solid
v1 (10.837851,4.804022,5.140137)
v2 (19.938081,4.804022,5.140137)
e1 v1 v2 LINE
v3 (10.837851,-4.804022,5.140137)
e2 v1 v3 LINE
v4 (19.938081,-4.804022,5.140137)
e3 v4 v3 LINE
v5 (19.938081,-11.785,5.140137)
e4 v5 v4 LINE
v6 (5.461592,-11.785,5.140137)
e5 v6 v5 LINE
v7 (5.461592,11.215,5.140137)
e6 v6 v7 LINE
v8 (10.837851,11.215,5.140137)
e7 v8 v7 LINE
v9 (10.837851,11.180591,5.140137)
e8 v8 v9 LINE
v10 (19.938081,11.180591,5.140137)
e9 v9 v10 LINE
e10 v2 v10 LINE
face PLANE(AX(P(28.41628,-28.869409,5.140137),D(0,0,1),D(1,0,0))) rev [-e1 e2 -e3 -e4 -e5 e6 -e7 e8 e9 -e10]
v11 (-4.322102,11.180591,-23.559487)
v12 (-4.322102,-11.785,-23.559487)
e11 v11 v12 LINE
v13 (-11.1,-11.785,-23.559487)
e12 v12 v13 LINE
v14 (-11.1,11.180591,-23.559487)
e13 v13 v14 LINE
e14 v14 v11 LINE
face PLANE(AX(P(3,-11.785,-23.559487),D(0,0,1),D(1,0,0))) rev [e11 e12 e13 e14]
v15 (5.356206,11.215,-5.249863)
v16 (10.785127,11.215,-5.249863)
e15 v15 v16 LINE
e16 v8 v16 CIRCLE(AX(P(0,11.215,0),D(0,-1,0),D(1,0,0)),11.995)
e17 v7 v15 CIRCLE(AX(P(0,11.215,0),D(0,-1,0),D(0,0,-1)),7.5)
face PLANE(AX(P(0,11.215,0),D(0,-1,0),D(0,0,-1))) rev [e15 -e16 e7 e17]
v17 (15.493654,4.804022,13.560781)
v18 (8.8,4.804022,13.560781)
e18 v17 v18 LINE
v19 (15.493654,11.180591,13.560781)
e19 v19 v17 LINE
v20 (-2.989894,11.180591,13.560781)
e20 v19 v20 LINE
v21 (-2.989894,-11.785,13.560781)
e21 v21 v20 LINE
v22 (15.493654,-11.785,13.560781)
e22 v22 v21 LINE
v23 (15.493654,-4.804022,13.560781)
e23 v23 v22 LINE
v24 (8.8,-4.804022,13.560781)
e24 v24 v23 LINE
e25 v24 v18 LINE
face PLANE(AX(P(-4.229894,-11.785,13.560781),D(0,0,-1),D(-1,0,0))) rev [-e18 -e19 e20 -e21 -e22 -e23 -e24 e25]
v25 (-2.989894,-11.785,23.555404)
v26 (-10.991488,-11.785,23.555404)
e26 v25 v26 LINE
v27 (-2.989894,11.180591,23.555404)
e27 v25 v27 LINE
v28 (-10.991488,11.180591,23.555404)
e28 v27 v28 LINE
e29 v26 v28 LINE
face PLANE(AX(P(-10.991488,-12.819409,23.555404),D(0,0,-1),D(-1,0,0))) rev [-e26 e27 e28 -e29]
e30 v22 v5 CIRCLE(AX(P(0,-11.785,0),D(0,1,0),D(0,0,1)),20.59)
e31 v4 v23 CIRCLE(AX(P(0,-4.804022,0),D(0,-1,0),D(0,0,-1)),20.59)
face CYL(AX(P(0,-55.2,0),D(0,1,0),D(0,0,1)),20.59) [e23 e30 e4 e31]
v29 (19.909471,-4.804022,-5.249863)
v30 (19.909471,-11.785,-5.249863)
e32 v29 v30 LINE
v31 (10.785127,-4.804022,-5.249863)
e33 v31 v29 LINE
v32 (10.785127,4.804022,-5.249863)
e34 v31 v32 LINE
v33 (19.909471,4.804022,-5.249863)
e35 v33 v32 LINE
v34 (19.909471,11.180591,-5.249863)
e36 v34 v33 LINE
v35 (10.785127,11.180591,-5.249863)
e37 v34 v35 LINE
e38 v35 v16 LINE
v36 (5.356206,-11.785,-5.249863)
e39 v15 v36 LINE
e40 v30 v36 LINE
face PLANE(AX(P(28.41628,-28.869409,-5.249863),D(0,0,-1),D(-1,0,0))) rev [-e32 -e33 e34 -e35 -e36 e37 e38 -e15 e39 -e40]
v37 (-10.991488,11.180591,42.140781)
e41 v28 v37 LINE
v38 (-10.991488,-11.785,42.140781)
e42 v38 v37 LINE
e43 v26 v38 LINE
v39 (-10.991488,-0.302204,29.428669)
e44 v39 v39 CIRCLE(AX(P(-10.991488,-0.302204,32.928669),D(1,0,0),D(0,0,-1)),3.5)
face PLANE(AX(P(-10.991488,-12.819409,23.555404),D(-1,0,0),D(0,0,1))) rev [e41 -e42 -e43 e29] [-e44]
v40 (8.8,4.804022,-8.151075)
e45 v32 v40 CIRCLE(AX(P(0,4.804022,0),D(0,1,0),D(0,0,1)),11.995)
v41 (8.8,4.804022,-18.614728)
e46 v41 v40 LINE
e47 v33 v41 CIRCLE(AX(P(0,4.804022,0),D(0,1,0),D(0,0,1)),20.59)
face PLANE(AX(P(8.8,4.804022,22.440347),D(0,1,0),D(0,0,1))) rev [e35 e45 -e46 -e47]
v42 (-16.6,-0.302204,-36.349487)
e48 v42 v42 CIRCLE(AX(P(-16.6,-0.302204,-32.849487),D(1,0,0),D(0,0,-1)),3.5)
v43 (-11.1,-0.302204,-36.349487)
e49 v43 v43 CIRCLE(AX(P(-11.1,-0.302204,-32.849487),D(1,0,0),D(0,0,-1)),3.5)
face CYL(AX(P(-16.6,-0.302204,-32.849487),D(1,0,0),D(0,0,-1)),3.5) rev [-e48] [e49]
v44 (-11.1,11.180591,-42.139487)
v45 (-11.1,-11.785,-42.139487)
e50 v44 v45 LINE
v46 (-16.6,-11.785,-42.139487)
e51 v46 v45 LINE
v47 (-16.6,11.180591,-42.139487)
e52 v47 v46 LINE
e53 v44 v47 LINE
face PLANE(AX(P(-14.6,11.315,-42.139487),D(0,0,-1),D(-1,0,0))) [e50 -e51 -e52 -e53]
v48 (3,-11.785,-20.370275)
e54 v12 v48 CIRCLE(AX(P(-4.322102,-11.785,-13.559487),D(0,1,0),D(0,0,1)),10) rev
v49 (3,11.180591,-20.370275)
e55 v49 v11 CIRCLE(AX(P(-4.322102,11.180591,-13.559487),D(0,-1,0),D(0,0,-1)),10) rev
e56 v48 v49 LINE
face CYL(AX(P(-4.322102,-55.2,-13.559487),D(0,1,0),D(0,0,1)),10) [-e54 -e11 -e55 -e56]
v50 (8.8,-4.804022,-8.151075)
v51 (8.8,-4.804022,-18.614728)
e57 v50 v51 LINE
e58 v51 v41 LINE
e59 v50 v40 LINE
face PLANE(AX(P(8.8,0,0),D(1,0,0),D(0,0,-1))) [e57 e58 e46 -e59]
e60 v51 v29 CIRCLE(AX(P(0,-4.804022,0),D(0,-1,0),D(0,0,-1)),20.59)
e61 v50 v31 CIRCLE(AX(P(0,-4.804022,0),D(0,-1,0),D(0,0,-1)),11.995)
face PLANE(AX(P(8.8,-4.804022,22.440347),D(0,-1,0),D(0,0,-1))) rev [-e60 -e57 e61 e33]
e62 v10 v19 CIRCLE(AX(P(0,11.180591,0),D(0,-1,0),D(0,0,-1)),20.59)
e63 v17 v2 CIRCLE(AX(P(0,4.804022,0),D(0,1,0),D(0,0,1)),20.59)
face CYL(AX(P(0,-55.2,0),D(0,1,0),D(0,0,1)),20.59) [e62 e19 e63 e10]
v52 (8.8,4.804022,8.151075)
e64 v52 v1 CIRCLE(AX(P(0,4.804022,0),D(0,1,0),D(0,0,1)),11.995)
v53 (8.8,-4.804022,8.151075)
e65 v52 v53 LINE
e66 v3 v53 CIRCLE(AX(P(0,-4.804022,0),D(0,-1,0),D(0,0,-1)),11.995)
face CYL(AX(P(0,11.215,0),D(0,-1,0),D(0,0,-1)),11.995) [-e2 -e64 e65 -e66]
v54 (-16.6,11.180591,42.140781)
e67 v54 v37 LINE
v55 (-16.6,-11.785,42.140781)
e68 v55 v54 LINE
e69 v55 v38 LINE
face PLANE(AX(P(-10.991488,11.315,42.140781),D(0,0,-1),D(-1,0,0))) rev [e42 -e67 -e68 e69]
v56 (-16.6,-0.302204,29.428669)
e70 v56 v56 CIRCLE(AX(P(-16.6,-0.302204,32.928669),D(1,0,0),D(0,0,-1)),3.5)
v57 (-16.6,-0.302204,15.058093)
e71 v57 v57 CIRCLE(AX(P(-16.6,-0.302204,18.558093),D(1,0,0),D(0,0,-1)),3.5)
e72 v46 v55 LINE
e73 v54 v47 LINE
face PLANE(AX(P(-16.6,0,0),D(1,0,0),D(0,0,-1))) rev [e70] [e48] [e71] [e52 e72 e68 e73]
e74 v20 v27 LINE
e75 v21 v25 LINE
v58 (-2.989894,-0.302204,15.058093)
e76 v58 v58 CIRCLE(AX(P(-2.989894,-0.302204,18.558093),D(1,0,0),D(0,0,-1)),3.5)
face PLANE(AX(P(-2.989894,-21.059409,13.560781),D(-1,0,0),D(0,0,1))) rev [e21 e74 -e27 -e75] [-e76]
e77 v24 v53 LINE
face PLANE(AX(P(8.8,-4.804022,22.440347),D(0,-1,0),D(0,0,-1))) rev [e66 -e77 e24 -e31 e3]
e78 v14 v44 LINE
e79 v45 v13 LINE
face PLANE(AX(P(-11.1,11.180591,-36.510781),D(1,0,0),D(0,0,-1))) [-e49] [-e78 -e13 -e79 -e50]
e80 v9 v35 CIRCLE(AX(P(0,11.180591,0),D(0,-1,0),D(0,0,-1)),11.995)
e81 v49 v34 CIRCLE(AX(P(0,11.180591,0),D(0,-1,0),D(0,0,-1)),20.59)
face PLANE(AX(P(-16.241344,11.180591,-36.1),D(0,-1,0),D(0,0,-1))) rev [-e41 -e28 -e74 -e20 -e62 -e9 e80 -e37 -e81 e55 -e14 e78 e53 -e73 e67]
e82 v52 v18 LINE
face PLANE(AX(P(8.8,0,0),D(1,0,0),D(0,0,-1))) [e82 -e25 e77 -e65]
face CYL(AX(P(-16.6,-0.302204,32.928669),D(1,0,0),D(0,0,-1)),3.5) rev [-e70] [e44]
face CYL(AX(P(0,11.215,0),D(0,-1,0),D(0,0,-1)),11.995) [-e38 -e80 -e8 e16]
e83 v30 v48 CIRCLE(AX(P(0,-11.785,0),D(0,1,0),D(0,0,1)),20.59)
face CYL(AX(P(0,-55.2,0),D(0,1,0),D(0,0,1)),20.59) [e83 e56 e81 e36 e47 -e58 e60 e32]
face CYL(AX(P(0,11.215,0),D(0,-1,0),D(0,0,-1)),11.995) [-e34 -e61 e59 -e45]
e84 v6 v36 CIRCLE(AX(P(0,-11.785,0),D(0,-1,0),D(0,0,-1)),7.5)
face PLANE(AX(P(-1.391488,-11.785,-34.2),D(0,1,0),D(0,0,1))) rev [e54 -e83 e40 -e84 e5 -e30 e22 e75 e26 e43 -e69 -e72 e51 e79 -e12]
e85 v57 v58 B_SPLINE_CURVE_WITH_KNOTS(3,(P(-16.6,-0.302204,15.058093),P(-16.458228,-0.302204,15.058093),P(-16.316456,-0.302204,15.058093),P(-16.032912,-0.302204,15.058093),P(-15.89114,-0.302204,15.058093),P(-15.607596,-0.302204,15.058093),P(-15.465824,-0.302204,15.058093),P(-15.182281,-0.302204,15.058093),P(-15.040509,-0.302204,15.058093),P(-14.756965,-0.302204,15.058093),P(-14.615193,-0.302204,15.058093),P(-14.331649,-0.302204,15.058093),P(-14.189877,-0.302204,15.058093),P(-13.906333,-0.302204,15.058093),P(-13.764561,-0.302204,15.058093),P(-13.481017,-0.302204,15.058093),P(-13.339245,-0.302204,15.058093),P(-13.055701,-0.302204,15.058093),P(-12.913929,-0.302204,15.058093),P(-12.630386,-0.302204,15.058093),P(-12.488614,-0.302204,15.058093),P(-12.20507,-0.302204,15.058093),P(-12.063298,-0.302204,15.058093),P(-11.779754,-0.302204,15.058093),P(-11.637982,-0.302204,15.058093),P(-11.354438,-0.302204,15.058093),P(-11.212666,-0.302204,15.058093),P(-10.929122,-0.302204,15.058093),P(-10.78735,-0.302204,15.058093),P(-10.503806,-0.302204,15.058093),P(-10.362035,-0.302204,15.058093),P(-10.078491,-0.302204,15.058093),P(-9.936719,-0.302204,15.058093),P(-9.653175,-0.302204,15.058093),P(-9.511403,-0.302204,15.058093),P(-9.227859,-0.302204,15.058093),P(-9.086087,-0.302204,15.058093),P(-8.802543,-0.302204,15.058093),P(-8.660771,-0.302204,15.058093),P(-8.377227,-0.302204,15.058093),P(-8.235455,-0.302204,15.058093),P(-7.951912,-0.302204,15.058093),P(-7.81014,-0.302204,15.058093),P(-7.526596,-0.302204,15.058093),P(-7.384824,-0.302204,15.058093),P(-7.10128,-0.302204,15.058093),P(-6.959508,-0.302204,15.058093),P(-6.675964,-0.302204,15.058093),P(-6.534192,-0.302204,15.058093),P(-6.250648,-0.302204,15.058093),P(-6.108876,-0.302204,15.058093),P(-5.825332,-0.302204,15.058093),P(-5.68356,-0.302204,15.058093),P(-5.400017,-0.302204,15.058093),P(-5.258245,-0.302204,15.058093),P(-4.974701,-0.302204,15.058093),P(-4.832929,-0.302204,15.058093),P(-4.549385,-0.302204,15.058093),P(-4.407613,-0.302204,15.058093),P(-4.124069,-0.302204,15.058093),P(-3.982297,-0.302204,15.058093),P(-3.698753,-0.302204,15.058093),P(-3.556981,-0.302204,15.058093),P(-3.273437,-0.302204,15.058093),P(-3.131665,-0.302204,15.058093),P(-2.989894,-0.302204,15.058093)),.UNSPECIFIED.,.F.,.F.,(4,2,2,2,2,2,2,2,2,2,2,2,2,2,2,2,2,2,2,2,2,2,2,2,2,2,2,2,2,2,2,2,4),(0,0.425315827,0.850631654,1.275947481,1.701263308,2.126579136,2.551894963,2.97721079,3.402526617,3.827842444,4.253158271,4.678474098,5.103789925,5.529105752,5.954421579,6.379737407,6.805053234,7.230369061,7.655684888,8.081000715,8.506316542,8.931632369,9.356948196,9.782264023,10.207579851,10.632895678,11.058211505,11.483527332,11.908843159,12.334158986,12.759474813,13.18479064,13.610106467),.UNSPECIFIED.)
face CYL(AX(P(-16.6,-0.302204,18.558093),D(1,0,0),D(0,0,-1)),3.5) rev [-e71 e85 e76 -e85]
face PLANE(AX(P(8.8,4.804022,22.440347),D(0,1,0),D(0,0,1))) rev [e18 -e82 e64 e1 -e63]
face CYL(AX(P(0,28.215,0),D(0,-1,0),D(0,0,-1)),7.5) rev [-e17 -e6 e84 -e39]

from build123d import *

# Parameters (mm, degrees)
SKETCH_1_R           = 20.68
SKETCH_1_R_2         = 9.68
EXTRUDE_1_DEPTH      = 116.68
SKETCH_11_W          = 27
SKETCH_11_H          = 150
CUT_EXTRUDE_3_DEPTH  = 40
SKETCH_13_W          = 10
SKETCH_13_H          = 128.345013401
CUT_EXTRUDE_7_DEPTH  = 126.614916312
SKETCH_15_W          = 8
SKETCH_15_H          = 68.68
CUT_EXTRUDE_9_DEPTH  = 48
SKETCH_16_W          = 15.549431524
SKETCH_16_H          = 20
SKETCH_16_W_2        = 15.459431524
EXTRUDE_4_DEPTH      = 19.2
SKETCH_17_W          = 19.20851187
SKETCH_17_H          = 14.03
CUT_EXTRUDE_10_DEPTH = 20.2
SKETCH_18_R          = 9.59
CUT_EXTRUDE_11_DEPTH = 121.289430957
SKETCH_21_R          = 2.985
CUT_EXTRUDE_12_DEPTH = 55.2
EXTRUDE_START        = 55.2
SKETCH_24_R          = 20.59
SKETCH_24_R_2        = 9.59
EXTRUDE_2_DEPTH      = 55.2
CUT_EXTRUDE_13_DEPTH = 55.2
SKETCH_26_W          = 10.00851187
SKETCH_26_H          = 41.68
CUT_EXTRUDE_15_DEPTH = 55.2
SKETCH_27_W          = 10
SKETCH_27_H          = 40
CUT_EXTRUDE_16_DEPTH = 55.2
SKETCH_28_W          = 44.880694938
SKETCH_28_H          = 9.608044066
CUT_EXTRUDE_17_DEPTH = 12.2
SKETCH_35_W          = 13.53
SKETCH_35_H          = 20
EXTRUDE_10_DEPTH     = 15
EXTRUDE_11_DEPTH     = 15
SKETCH_37_W          = 9
SKETCH_37_H          = 20
EXTRUDE_12_DEPTH     = 20
SKETCH_38_W          = 9
SKETCH_38_H          = 20
EXTRUDE_13_DEPTH     = 20
SKETCH_42_R          = 2.985
CUT_EXTRUDE_21_DEPTH = 20
CUT_EXTRUDE_23_DEPTH = 138.235841092
SKETCH_45_W          = 3
SKETCH_45_H          = 20
EXTRUDE_14_DEPTH     = 30
SKETCH_46_W          = 3
SKETCH_46_H          = 20
EXTRUDE_15_DEPTH     = 30
SKETCH_47_W          = 33.078221107
SKETCH_47_H          = 20
EXTRUDE_16_DEPTH     = 50
SKETCH_48_W          = 30
SKETCH_48_H          = 20
EXTRUDE_17_DEPTH     = 50
SKETCH_50_W          = 50
SKETCH_50_H          = 20
EXTRUDE_18_DEPTH     = 1
SKETCH_51_W          = 50
SKETCH_51_H          = 20
EXTRUDE_19_DEPTH     = 1
SKETCH_52_W          = 53
SKETCH_52_H          = 14
CUT_EXTRUDE_24_DEPTH = 151.972575738
SKETCH_53_W          = 53
SKETCH_53_H          = 14
CUT_EXTRUDE_25_DEPTH = 151.942387436
SKETCH_54_W          = 40
SKETCH_54_H          = 73.27
CUT_EXTRUDE_26_DEPTH = 147.866192927
SKETCH_56_W          = 13.00851187
SKETCH_56_H          = 20
EXTRUDE_21_DEPTH     = 3.08
SKETCH_60_W          = 6.504255935
SKETCH_60_H          = 76.35
CUT_EXTRUDE_30_DEPTH = 137.106994034
CUT_EXTRUDE_32_DEPTH = 20
SKETCH_64_W          = 16.20851187
SKETCH_64_H          = 0.09
EXTRUDE_22_DEPTH     = 20
SKETCH_65_W          = 3.495744065
SKETCH_65_H          = 3.26
CUT_EXTRUDE_33_DEPTH = 137.057988464
SKETCH_66_W          = 3.495744065
SKETCH_66_H          = 1.776778893
SKETCH_66_W_2        = 3.503635083
SKETCH_66_H_2        = 1.775
EXTRUDE_23_DEPTH     = 20.2
SKETCH_68_W          = 6.504255935
SKETCH_68_H          = 3.66
CUT_EXTRUDE_34_DEPTH = 20
SKETCH_69_R          = 2.985
CUT_EXTRUDE_35_DEPTH = 126.598983893
SKETCH_70_R          = 2.985
CUT_EXTRUDE_36_DEPTH = 132.360728238
SKETCH_71_W          = 38.005321573
SKETCH_71_H          = 111.965885132
CUT_EXTRUDE_37_DEPTH = 147.475577566
SKETCH_72_R          = 9.7
CUT_EXTRUDE_38_DEPTH = 38.185254838
CUT_EXTRUDE_START    = -22
SKETCH_77_R          = 30.59
SKETCH_77_R_2        = 20.59
CUT_EXTRUDE_2_DEPTH  = 22
SKETCH_78_W          = 34.816185151
SKETCH_78_H          = 22.96559116
EXTRUDE_26_DEPTH     = 0.1
SKETCH_80_W          = 2.900031179
SKETCH_80_H          = 6.148706656
EXTRUDE_28_DEPTH     = 23.1
SKETCH_81_W          = 6.148706656
SKETCH_81_H          = 23.1
EXTRUDE_29_DEPTH     = 14.1
SKETCH_82_W          = 6.148706656
SKETCH_82_H          = 0.13440884
CUT_EXTRUDE_39_DEPTH = 19.1
SKETCH_83_W          = 2.900031179
SKETCH_83_H          = 22.96559116
EXTRUDE_30_DEPTH     = 19.1
FILLET_1_R           = 10
SKETCH_84_W          = 3.5
SKETCH_84_H          = 19.1
EXTRUDE_31_DEPTH     = 23.1
SKETCH_85_W          = 3.5
SKETCH_85_H          = 0.52
CUT_EXTRUDE_40_DEPTH = 48.860163141
SKETCH_86_W          = 3.5
SKETCH_86_H          = 22.96559116
EXTRUDE_32_DEPTH     = 62.1
SKETCH_87_W          = 3.60851187
SKETCH_87_H          = 34.816185151
CUT_EXTRUDE_41_DEPTH = 62.1
SKETCH_89_W          = 0.10851187
SKETCH_89_H          = 6.15
EXTRUDE_33_DEPTH     = 23.1
EXTRUDE_34_DEPTH     = 22.1
SKETCH_91_W          = 0.971561636
SKETCH_91_H          = 22.96559116
CUT_EXTRUDE_42_DEPTH = 22.1
SKETCH_95_W          = 6.15
SKETCH_95_H          = 22.96559116
EXTRUDE_35_DEPTH     = 14.1
FILLET_2_R           = 10
SKETCH_96_W          = 3.60851187
SKETCH_96_H          = 2.548438364
CUT_EXTRUDE_43_DEPTH = 55.35700885
SKETCH_97_W          = 3.5
SKETCH_97_H          = 6.148706656
EXTRUDE_36_DEPTH     = 23.1
CUT_EXTRUDE_44_DEPTH = 23.1
SKETCH_99_W          = 6.15
SKETCH_99_H          = 0.13440884
CUT_EXTRUDE_45_DEPTH = 23.1
SKETCH_101_R         = 2.985
CUT_EXTRUDE_46_DEPTH = 23.1
SKETCH_103_W         = 3.60851187
SKETCH_103_H         = 0.54
CUT_EXTRUDE_49_DEPTH = 53.222714265
SKETCH_104_W         = 3.60851187
SKETCH_104_H         = 0.54
CUT_EXTRUDE_50_DEPTH = 53.222714265
SKETCH_123_W         = 24.188706656
SKETCH_123_H         = 22.96559116
SKETCH_123_W_2       = 24.195376485
EXTRUDE_37_DEPTH     = 2
SKETCH_124_R         = 3.05
CUT_EXTRUDE_60_DEPTH = 57.152183688
SKETCH_126_W         = 29.889481087
SKETCH_126_H         = 8.39
CUT_EXTRUDE_61_DEPTH = 53.222714265
SKETCH_127_W         = 18.58
SKETCH_127_H         = 22.96559116
EXTRUDE_38_DEPTH     = 10
SKETCH_128_R         = 3.25
CUT_EXTRUDE_62_DEPTH = 58.155273368
SKETCH_129_R         = 3.25
CUT_EXTRUDE_63_DEPTH = 58.155273368
SKETCH_130_W         = 24.958479246
SKETCH_130_H         = 10
CUT_EXTRUDE_64_DEPTH = 53.058343712
SKETCH_136_W         = 10
SKETCH_136_H         = 18.585376485
CUT_EXTRUDE_68_DEPTH = 24
SKETCH_138_W         = 5.60851187
SKETCH_138_H         = 22.96559116
EXTRUDE_40_DEPTH     = 38
SKETCH_141_W         = 9.994623515
SKETCH_141_H         = 22.96559116
EXTRUDE_41_DEPTH     = 3.24
SKETCH_144_W         = 2
SKETCH_144_H         = 9.994623515
CUT_EXTRUDE_70_DEPTH = 32.24
SKETCH_146_R         = 3.5
CUT_EXTRUDE_72_DEPTH = 54.719053459
SKETCH_150_R         = 3.5
CUT_EXTRUDE_74_DEPTH = 50.508459618
SKETCH_152_W         = 22.731002657
SKETCH_152_H         = 10.39
CUT_EXTRUDE_75_DEPTH = 40.05
SKETCH_153_R         = 11.995
SKETCH_153_R_2       = 6.995
EXTRUDE_3_DEPTH      = 23
CUT_EXTRUDE_76_DEPTH = 27
SKETCH_156_R         = 7.5
CUT_EXTRUDE_77_DEPTH = 40


with BuildPart() as part:
    # 草圖1 → 伸長-薄件1 (new body)
    with BuildSketch(Plane(origin=(0, 0, 0), x_dir=(1, 0, 0), z_dir=(0, 1, 0))):
        Circle(SKETCH_1_R)
        Circle(SKETCH_1_R_2, mode=Mode.SUBTRACT)
    extrude(amount=EXTRUDE_1_DEPTH)

    # 草圖11 → 除料-伸長3 (cut)
    with BuildSketch(Plane(origin=(0, 116.68, 0), x_dir=(1, 0, 0), z_dir=(0, 1, 0))):
        with Locations((21.70851187, -44.235815192)):
            Rectangle(SKETCH_11_W, SKETCH_11_H)
    extrude(amount=-CUT_EXTRUDE_3_DEPTH, mode=Mode.SUBTRACT)

    # 草圖13 → 除料-伸長7 (cut, through all)
    with BuildSketch(Plane.XY.offset(21)):
        with Locations((-16, 58.612182466)):
            Rectangle(SKETCH_13_W, SKETCH_13_H)
    extrude(amount=-CUT_EXTRUDE_7_DEPTH, mode=Mode.SUBTRACT)

    # 草圖15 → 除料-伸長9 (cut)
    with BuildSketch(Plane.XY.offset(21)):
        with Locations((-1.395744065, 52.34)):
            Rectangle(SKETCH_15_W, SKETCH_15_H)
    extrude(amount=-CUT_EXTRUDE_9_DEPTH, mode=Mode.SUBTRACT)

    # 草圖16 → 填料-伸長4 (add)
    with BuildSketch(Plane(origin=(8.20851187, 0, 0), x_dir=(0, 0, -1), z_dir=(1, 0, 0))):
        with Locations((12.905284238, 106.68)):
            Rectangle(SKETCH_16_W, SKETCH_16_H)
        with Locations((-12.860284238, 106.68)):
            Rectangle(SKETCH_16_W_2, SKETCH_16_H)
    extrude(amount=-EXTRUDE_4_DEPTH)

    # 草圖17 → 除料-伸長10 (cut)
    with BuildSketch(Plane(origin=(0, 116.68, 0), x_dir=(1, 0, 0), z_dir=(0, 1, 0))):
        with Locations((-1.395744065, -0.045)):
            Rectangle(SKETCH_17_W, SKETCH_17_H)
    extrude(amount=-CUT_EXTRUDE_10_DEPTH, mode=Mode.SUBTRACT)

    # 草圖18 → 除料-伸長11 (cut, through all)
    with BuildSketch(Plane.XZ):
        with Locations(Location((0, 0, 0), (0, 0, 90))):
            Circle(SKETCH_18_R)
    extrude(amount=-CUT_EXTRUDE_11_DEPTH, mode=Mode.SUBTRACT)

    # 草圖21 → 除料-伸長12 (cut)
    with BuildSketch(Plane(origin=(0, 0, -20.68), x_dir=(-1, 0, 0), z_dir=(0, 0, -1))):
        with Locations((1.39148813, 108.73)):
            Circle(SKETCH_21_R)
    extrude(amount=-CUT_EXTRUDE_12_DEPTH, mode=Mode.SUBTRACT)

    # 草圖24 → 伸長-薄件2 (add)
    with BuildSketch(Plane.XZ.offset(EXTRUDE_START)):
        Circle(SKETCH_24_R)
        Circle(SKETCH_24_R_2, mode=Mode.SUBTRACT)
    extrude(amount=-EXTRUDE_2_DEPTH)

    # 草圖25 → 除料-伸長13 (cut)
    with BuildSketch(Plane.XY.offset(21)):
        Polygon((-1.39148813, -11.785), (22.612379708, -11.785), (22.612379708, -63.873337429), (-22.749525245, -63.873337429), (-22.749525245, -11.785), align=None)
    extrude(amount=-CUT_EXTRUDE_13_DEPTH, mode=Mode.SUBTRACT)

    # 草圖26 → 除料-伸長15 (cut)
    with BuildSketch(Plane(origin=(0, 0, 0), x_dir=(1, 0, 0), z_dir=(0, 1, 0))):
        with Locations((-15.995744065, -0.16)):
            Rectangle(SKETCH_26_W, SKETCH_26_H)
    extrude(amount=-CUT_EXTRUDE_15_DEPTH, mode=Mode.SUBTRACT)

    # 草圖27 → 除料-伸長16 (cut)
    with BuildSketch(Plane(origin=(21, 0, 0), x_dir=(0, 0, -1), z_dir=(1, 0, 0))):
        with Locations((0, 41.68)):
            Rectangle(SKETCH_27_W, SKETCH_27_H)
    extrude(amount=-CUT_EXTRUDE_16_DEPTH, mode=Mode.SUBTRACT)

    # 草圖28 → 除料-伸長17 (cut)
    with BuildSketch(Plane(origin=(21, 0, 0), x_dir=(0, 0, -1), z_dir=(1, 0, 0))):
        Rectangle(SKETCH_28_W, SKETCH_28_H)
    extrude(amount=-CUT_EXTRUDE_17_DEPTH, mode=Mode.SUBTRACT)

    # 草圖35 → 填料-伸長10 (add)
    with BuildSketch(Plane.ZY.offset(10.99148813)):
        with Locations((13.825, 106.68)):
            Rectangle(SKETCH_35_W, SKETCH_35_H)
    extrude(amount=EXTRUDE_10_DEPTH)

    # 草圖36 → 填料-伸長11 (add)
    with BuildSketch(Plane.ZY.offset(10.99148813)):
        Polygon((-20.68, 116.68), (-6.97, 116.68), (-6.97, 96.48), (-20.68, 96.68), align=None)
    extrude(amount=EXTRUDE_11_DEPTH)

    # 草圖37 → 填料-伸長12 (add)
    with BuildSketch(Plane.XY.offset(20.59)):
        with Locations((-21.49148813, 106.68)):
            Rectangle(SKETCH_37_W, SKETCH_37_H)
    extrude(amount=EXTRUDE_12_DEPTH)

    # 草圖38 → 填料-伸長13 (add)
    with BuildSketch(Plane(origin=(0, 0, -20.68), x_dir=(-1, 0, 0), z_dir=(0, 0, -1))):
        with Locations((21.49148813, 106.68)):
            Rectangle(SKETCH_38_W, SKETCH_38_H)
    extrude(amount=EXTRUDE_13_DEPTH)

    # 草圖42 → 除料-伸長21 (cut)
    with BuildSketch(Plane(origin=(-16.99148813, 0, 0), x_dir=(0, 0, -1), z_dir=(1, 0, 0))):
        with Locations((30.68, 106.554418142)):
            Circle(SKETCH_42_R)
        with Locations((-30.395640125, 106.68)):
            Circle(SKETCH_42_R)
    extrude(amount=-CUT_EXTRUDE_21_DEPTH, mode=Mode.SUBTRACT)

    # 草圖43 → 除料-伸長23 (cut, through all)
    with BuildSketch(Plane(origin=(0, 116.68, 0), x_dir=(1, 0, 0), z_dir=(0, 1, 0))):
        Polygon((-11, 6.97), (-10.99148813, 20.68), (-10.99148813, 48.096794253), (-28.274756234, 48.096794253), (-28.274756234, -43.270506289), (-11, -43.270506289), align=None)
    extrude(amount=-CUT_EXTRUDE_23_DEPTH, mode=Mode.SUBTRACT)

    # 草圖45 → 填料-伸長14 (add)
    with BuildSketch(Plane.XY.offset(20.59)):
        with Locations((-9.5, 106.68)):
            Rectangle(SKETCH_45_W, SKETCH_45_H)
    extrude(amount=EXTRUDE_14_DEPTH)

    # 草圖46 → 填料-伸長15 (add)
    with BuildSketch(Plane(origin=(0, 0, -20.68), x_dir=(-1, 0, 0), z_dir=(0, 0, -1))):
        with Locations((9.49148813, 106.68)):
            Rectangle(SKETCH_46_W, SKETCH_46_H)
    extrude(amount=EXTRUDE_15_DEPTH)

    # 草圖47 → 填料-伸長16 (add)
    with BuildSketch(Plane.ZY.offset(11)):
        with Locations((34.050889447, 106.68)):
            Rectangle(SKETCH_47_W, SKETCH_47_H)
    extrude(amount=EXTRUDE_16_DEPTH)

    # 草圖48 → 填料-伸長17 (add)
    with BuildSketch(Plane.ZY.offset(10.99148813)):
        with Locations((-35.68, 106.68)):
            Rectangle(SKETCH_48_W, SKETCH_48_H)
    extrude(amount=EXTRUDE_17_DEPTH)

    # 草圖50 → 填料-伸長18 (add)
    with BuildSketch(Plane(origin=(0, 0, 17.511778893), x_dir=(-1, 0, 0), z_dir=(0, 0, -1))):
        with Locations((36, 106.68)):
            Rectangle(SKETCH_50_W, SKETCH_50_H)
    extrude(amount=EXTRUDE_18_DEPTH)

    # 草圖51 → 填料-伸長19 (add)
    with BuildSketch(Plane.XY.offset(-20.68)):
        with Locations((-35.99148813, 106.68)):
            Rectangle(SKETCH_51_W, SKETCH_51_H)
    extrude(amount=EXTRUDE_19_DEPTH)

    # 草圖52 → 除料-伸長24 (cut, through all)
    with BuildSketch(Plane(origin=(0, 116.68, 0), x_dir=(1, 0, 0), z_dir=(0, 1, 0))):
        with Locations((-34.49148813, 43.68)):
            Rectangle(SKETCH_52_W, SKETCH_52_H)
    extrude(amount=-CUT_EXTRUDE_24_DEPTH, mode=Mode.SUBTRACT)

    # 草圖53 → 除料-伸長25 (cut, through all)
    with BuildSketch(Plane(origin=(0, 116.68, 0), x_dir=(1, 0, 0), z_dir=(0, 1, 0))):
        with Locations((-34.5, -43.59)):
            Rectangle(SKETCH_53_W, SKETCH_53_H)
    extrude(amount=-CUT_EXTRUDE_25_DEPTH, mode=Mode.SUBTRACT)

    # 草圖54 → 除料-伸長26 (cut, through all)
    with BuildSketch(Plane(origin=(0, 116.68, 0), x_dir=(1, 0, 0), z_dir=(0, 1, 0))):
        with Locations((-41, 0.045)):
            Rectangle(SKETCH_54_W, SKETCH_54_H)
    extrude(amount=-CUT_EXTRUDE_26_DEPTH, mode=Mode.SUBTRACT)

    # 草圖56 → 填料-伸長21 (add)
    with BuildSketch(Plane(origin=(0, 0, -36.68), x_dir=(-1, 0, 0), z_dir=(0, 0, -1))):
        with Locations((14.495744065, 106.68)):
            Rectangle(SKETCH_56_W, SKETCH_56_H)
    extrude(amount=EXTRUDE_21_DEPTH)

    # 草圖60 → 除料-伸長30 (cut, through all)
    with BuildSketch(Plane(origin=(0, 116.68, 0), x_dir=(1, 0, 0), z_dir=(0, 1, 0))):
        with Locations((-17.747872032, 1.585)):
            Rectangle(SKETCH_60_W, SKETCH_60_H)
    extrude(amount=-CUT_EXTRUDE_30_DEPTH, mode=Mode.SUBTRACT)

    # 草圖61 → 除料-伸長32 (cut)
    with BuildSketch(Plane(origin=(0, 116.68, 0), x_dir=(1, 0, 0), z_dir=(0, 1, 0))):
        Polygon((1.92725193, -20.59), (1.92725193, -22.399121663), (-2.174190472, -21.421542421), (-2.174190472, -20.59), align=None)
    extrude(amount=-CUT_EXTRUDE_32_DEPTH, mode=Mode.SUBTRACT)

    # 草圖64 → 填料-伸長22 (add)
    with BuildSketch(Plane(origin=(0, 116.68, 0), x_dir=(1, 0, 0), z_dir=(0, 1, 0))):
        with Locations((0.104255935, -20.635)):
            Rectangle(SKETCH_64_W, SKETCH_64_H)
    extrude(amount=-EXTRUDE_22_DEPTH)

    # 草圖65 → 除料-伸長33 (cut, through all)
    with BuildSketch(Plane(origin=(0, 116.68, 0), x_dir=(1, 0, 0), z_dir=(0, 1, 0))):
        with Locations((-12.747872033, -18.141778893)):
            Rectangle(SKETCH_65_W, SKETCH_65_H)
    extrude(amount=-CUT_EXTRUDE_33_DEPTH, mode=Mode.SUBTRACT)

    # 草圖66 → 填料-伸長23 (add)
    with BuildSketch(Plane(origin=(0, 96.48, 0), x_dir=(1, 0, 0), z_dir=(0, 1, 0))):
        with Locations((-12.747872033, -18.883389447)):
            Rectangle(SKETCH_66_W, SKETCH_66_H)
        with Locations((-12.743926524, 18.7925)):
            Rectangle(SKETCH_66_W_2, SKETCH_66_H_2)
    extrude(amount=EXTRUDE_23_DEPTH)

    # 草圖68 → 除料-伸長34 (cut)
    with BuildSketch(Plane(origin=(0, 116.68, 0), x_dir=(1, 0, 0), z_dir=(0, 1, 0))):
        with Locations((-11.243616098, 37.93)):
            Rectangle(SKETCH_68_W, SKETCH_68_H)
    extrude(amount=-CUT_EXTRUDE_34_DEPTH, mode=Mode.SUBTRACT)

    # 草圖69 → 除料-伸長35 (cut, through all)
    with BuildSketch(Plane(origin=(-7.99148813, 0, 0), x_dir=(0, 0, -1), z_dir=(1, 0, 0))):
        with Locations((28.39, 106.68)):
            Circle(SKETCH_69_R)
        with Locations((-28.635, 106.68)):
            Circle(SKETCH_69_R)
    extrude(amount=-CUT_EXTRUDE_35_DEPTH, mode=Mode.SUBTRACT)

    # 草圖70 → 除料-伸長36 (cut, through all)
    with BuildSketch(Plane(origin=(0, 0, 20.59), x_dir=(-1, 0, 0), z_dir=(0, 0, -1))):
        with Locations((1.39148813, 108.73)):
            Circle(SKETCH_70_R)
    extrude(amount=-CUT_EXTRUDE_36_DEPTH, mode=Mode.SUBTRACT)

    # 草圖71 → 除料-伸長37 (cut, through all)
    with BuildSketch(Plane.XY.offset(50)):
        with Locations((2.76131712, 67.163533726)):
            Rectangle(SKETCH_71_W, SKETCH_71_H)
    extrude(amount=-CUT_EXTRUDE_37_DEPTH, mode=Mode.SUBTRACT)

    # 草圖72 → 除料-伸長38 (cut, through all)
    with BuildSketch(Plane.XZ.offset(11.785)):
        with Locations(Location((0, 0, 0), (0, 0, 270))):
            Circle(SKETCH_72_R)
    extrude(amount=-CUT_EXTRUDE_38_DEPTH, mode=Mode.SUBTRACT)

    # 草圖77 → 除料-伸長-薄件2 (cut)
    with BuildSketch(Plane(origin=(0, 11.18059116, 0), x_dir=(1, 0, 0), z_dir=(0, 1, 0)).offset(CUT_EXTRUDE_START)):
        Circle(SKETCH_77_R)
        Circle(SKETCH_77_R_2, mode=Mode.SUBTRACT)
    extrude(amount=CUT_EXTRUDE_2_DEPTH, mode=Mode.SUBTRACT)

    # 草圖78 → 填料-伸長26 (add)
    with BuildSketch(Plane.ZY.offset(11)):
        with Locations((-0.002688243, -0.30220442)):
            Rectangle(SKETCH_78_W, SKETCH_78_H)
    extrude(amount=EXTRUDE_26_DEPTH)



with BuildPart() as body_2:
    # 草圖80 → 填料-伸長28 (new body)
    with BuildSketch(Plane.XZ.offset(11.785)):
        with Locations((-12.55001559, -20.485134146)):
            Rectangle(SKETCH_80_W, SKETCH_80_H)
    extrude(amount=-EXTRUDE_28_DEPTH)


with BuildPart() as part_1:
    add(part.part)

    add(body_2.part)  # 填料-伸長29 merges body 2
    # 草圖81 → 填料-伸長29 (add)
    with BuildSketch(Plane(origin=(-11.1, 0, 0), x_dir=(0, 0, -1), z_dir=(1, 0, 0))):
        with Locations((20.485134146, -0.235)):
            Rectangle(SKETCH_81_W, SKETCH_81_H)
    extrude(amount=EXTRUDE_29_DEPTH)

    # 草圖82 → 除料-伸長39 (cut)
    with BuildSketch(Plane(origin=(3, 0, 0), x_dir=(0, 0, -1), z_dir=(1, 0, 0))):
        with Locations((20.485134146, 11.24779558)):
            Rectangle(SKETCH_82_W, SKETCH_82_H)
    extrude(amount=-CUT_EXTRUDE_39_DEPTH, mode=Mode.SUBTRACT)

    # 草圖83 → 填料-伸長30 (add)
    with BuildSketch(Plane.XY.offset(-17.410780818)):
        with Locations((-12.55001559, -0.30220442)):
            Rectangle(SKETCH_83_W, SKETCH_83_H)
    extrude(amount=-EXTRUDE_30_DEPTH)

    # 圓角1
    # the kernel refuses this fillet: 10 mm, written as the material it takes off along each edge
    with BuildSketch(Plane(origin=(3, -30.090254449, -23.559487474), x_dir=(-1, 0, 0), z_dir=(0, 1, 0))) as fillet_1_piece_1:
        with BuildLine():
            CenterArc((7.32210178, 10), FILLET_1_R, 222.927997508, 47.072002492)
            Line((0, 3.189212562), (-0.146442036, 3.052996813))
            ThreePointArc((-0.146442036, 3.052996813), (-0.2, 1.594606281), (-0.2, 0))
            Line((-0.2, 0), (0, -0.2))
            Line((0, -0.2), (7.32210178, -0.2))
            Line((7.32210178, -0.2), (7.32210178, 0))
        make_face()
    extrude(amount=59.576100059, mode=Mode.SUBTRACT)

    # 草圖84 → 填料-伸長31 (add)
    with BuildSketch(Plane(origin=(0, -11.785, 0), x_dir=(-1, 0, 0), z_dir=(0, -1, 0))):
        with Locations((12.85, 26.960780818)):
            Rectangle(SKETCH_84_W, SKETCH_84_H)
    extrude(amount=-EXTRUDE_31_DEPTH)

    # 草圖85 → 除料-伸長40 (cut, through all)
    with BuildSketch(Plane.XZ.offset(11.785)):
        with Locations((-12.85, -36.250780818)):
            Rectangle(SKETCH_85_W, SKETCH_85_H)
    extrude(amount=-CUT_EXTRUDE_40_DEPTH, mode=Mode.SUBTRACT)

    # 草圖86 → 填料-伸長32 (add)
    with BuildSketch(Plane.XY.offset(-17.410780818)):
        with Locations((-12.85, -0.30220442)):
            Rectangle(SKETCH_86_W, SKETCH_86_H)
    extrude(amount=EXTRUDE_32_DEPTH)

    # 草圖87 → 除料-伸長41 (cut)
    with BuildSketch(Plane.XZ.offset(11.785)):
        with Locations((-12.795744065, -0.002688243)):
            Rectangle(SKETCH_87_W, SKETCH_87_H)
    extrude(amount=-CUT_EXTRUDE_41_DEPTH, mode=Mode.SUBTRACT)


with BuildPart() as cut_extrude_41_piece_1:
    # of the separate pieces the step leaves, piece 1, a body of its own (cut_extrude_41_pieces)
    add(part_1.part.solids().sort_by_distance((3, 11.18059116, -20.370274912))[0])



with BuildPart() as cut_extrude_41_piece_2:
    # of the separate pieces the step leaves, piece 2, a body of its own (cut_extrude_41_pieces)
    add(part_1.part.solids().sort_by_distance((-11.1, 11.18059116, 17.405404333))[0])

    # 草圖89 → 填料-伸長33 (add)
    with BuildSketch(Plane.XZ.offset(11.785)):
        with Locations((-11.045744065, 20.485780818)):
            Rectangle(SKETCH_89_W, SKETCH_89_H)
    extrude(amount=-EXTRUDE_33_DEPTH)

    # 草圖90 → 填料-伸長34 (add)
    with BuildSketch(Plane.XY.offset(23.560780818)):
        Polygon((-11, 11.18059116), (-11.1, 11.18059116), (-11.1, -11.785), (-10.99148813, -11.785), (-10.99148813, 11.18059116), align=None)
    extrude(amount=EXTRUDE_34_DEPTH)

    # 草圖91 → 除料-伸長42 (cut)
    with BuildSketch(Plane.ZY.offset(11.1)):
        with Locations((45.175, -0.30220442)):
            Rectangle(SKETCH_91_W, SKETCH_91_H)
    extrude(amount=-CUT_EXTRUDE_42_DEPTH, mode=Mode.SUBTRACT)


with BuildPart() as cut_extrude_41_piece_1_1:
    add(cut_extrude_41_piece_1.part)

    add(cut_extrude_41_piece_2.part)  # 填料-伸長35 merges 除料-伸長41 piece 2
    # 草圖95 → 填料-伸長35 (add)
    with BuildSketch(Plane(origin=(-10.99148813, 0, 0), x_dir=(0, 0, -1), z_dir=(1, 0, 0))):
        with Locations((-20.485780818, -0.30220442)):
            Rectangle(SKETCH_95_W, SKETCH_95_H)
    extrude(amount=EXTRUDE_35_DEPTH)

    # 圓角2
    # the kernel refuses this fillet: 10 mm, written as the material it takes off along each edge
    with BuildSketch(Plane(origin=(3.10851187, -30.131013506, 23.560780818), x_dir=(-1, 0, 0), z_dir=(0, 1, 0))) as fillet_2_piece_1:
        with BuildLine():
            CenterArc((7.338405402, -10), FILLET_2_R, 90, 47.209333859)
            Line((0, -3.206782342), (-0.146768108, -3.070917989))
            ThreePointArc((-0.146768108, -3.070917989), (-0.2, -1.603391171), (-0.2, 0))
            Line((-0.2, 0), (0, 0.2))
            Line((0, 0.2), (7.338405402, 0.2))
            Line((7.338405402, 0.2), (7.338405402, 0))
        make_face()
    extrude(amount=59.657618171, mode=Mode.SUBTRACT)

    # 草圖96 → 除料-伸長43 (cut, through all)
    with BuildSketch(Plane.XZ.offset(11.785)):
        with Locations((-12.795744065, 43.415)):
            Rectangle(SKETCH_96_W, SKETCH_96_H)
    extrude(amount=-CUT_EXTRUDE_43_DEPTH, mode=Mode.SUBTRACT)

    # 草圖97 → 填料-伸長36 (add)
    with BuildSketch(Plane.XZ.offset(11.785)):
        with Locations((-12.85, -39.065134146)):
            Rectangle(SKETCH_97_W, SKETCH_97_H)
    extrude(amount=-EXTRUDE_36_DEPTH)

    # 草圖98 → 除料-伸長44 (cut)
    with BuildSketch(Plane(origin=(-11.1, 0, 0), x_dir=(0, 0, -1), z_dir=(1, 0, 0))):
        Polygon((17.410780818, 11.18059116), (17.410780818, 11.315), (22.198280677, 11.315), (38.461669752, 11.315), (42.139487474, 11.315), (42.139487474, 11.18059116), align=None)
    extrude(amount=-CUT_EXTRUDE_44_DEPTH, mode=Mode.SUBTRACT)

    # 草圖99 → 除料-伸長45 (cut)
    with BuildSketch(Plane(origin=(-10.99148813, 0, 0), x_dir=(0, 0, -1), z_dir=(1, 0, 0))):
        with Locations((-20.485780818, 11.24779558)):
            Rectangle(SKETCH_99_W, SKETCH_99_H)
    extrude(amount=-CUT_EXTRUDE_45_DEPTH, mode=Mode.SUBTRACT)

    # 草圖101 → 除料-伸長46 (cut)
    with BuildSketch(Plane(origin=(-10.99148813, 0, 0), x_dir=(0, 0, -1), z_dir=(1, 0, 0))):
        with Locations((-32.928668636, -0.30220442)):
            Circle(SKETCH_101_R)
        with Locations((32.849487474, -0.30220442)):
            Circle(SKETCH_101_R)
    extrude(amount=-CUT_EXTRUDE_46_DEPTH, mode=Mode.SUBTRACT)

    # 草圖103 → 除料-伸長49 (cut, through all)
    with BuildSketch(Plane(origin=(0, 11.18059116, 0), x_dir=(1, 0, 0), z_dir=(0, 1, 0))):
        with Locations((-12.795744065, -17.675404333)):
            Rectangle(SKETCH_103_W, SKETCH_103_H)
    extrude(amount=-CUT_EXTRUDE_49_DEPTH, mode=Mode.SUBTRACT)

    # 草圖104 → 除料-伸長50 (cut, through all)
    with BuildSketch(Plane(origin=(0, 11.18059116, 0), x_dir=(1, 0, 0), z_dir=(0, 1, 0))):
        with Locations((-12.795744065, 17.680780818)):
            Rectangle(SKETCH_104_W, SKETCH_104_H)
    extrude(amount=-CUT_EXTRUDE_50_DEPTH, mode=Mode.SUBTRACT)

    # 草圖123 → 填料-伸長37 (add)
    with BuildSketch(Plane.ZY.offset(14.6)):
        with Locations((-30.045134146, -0.30220442)):
            Rectangle(SKETCH_123_W, SKETCH_123_H)
        with Locations((30.043092576, -0.30220442)):
            Rectangle(SKETCH_123_W_2, SKETCH_123_H)
    extrude(amount=EXTRUDE_37_DEPTH)

    # 草圖124 → 除料-伸長60 (cut, through all)
    with BuildSketch(Plane(origin=(-14.6, 0, 0), x_dir=(0, 0, -1), z_dir=(1, 0, 0))):
        with Locations((32.849487474, -0.30220442)):
            Circle(SKETCH_124_R)
        with Locations((-32.928668636, -0.30220442)):
            Circle(SKETCH_124_R)
    extrude(amount=-CUT_EXTRUDE_60_DEPTH, mode=Mode.SUBTRACT)

    # 草圖126 → 除料-伸長61 (cut, through all)
    with BuildSketch(Plane(origin=(0, 11.18059116, 0), x_dir=(1, 0, 0), z_dir=(0, 1, 0))):
        with Locations((20.589926908, 0.054862893)):
            Rectangle(SKETCH_126_W, SKETCH_126_H)
    extrude(amount=-CUT_EXTRUDE_61_DEPTH, mode=Mode.SUBTRACT)

    # 草圖127 → 填料-伸長38 (add)
    with BuildSketch(Plane(origin=(-10.99148813, 0, 0), x_dir=(0, 0, -1), z_dir=(1, 0, 0))):
        with Locations((-32.850780818, -0.30220442)):
            Rectangle(SKETCH_127_W, SKETCH_127_H)
    extrude(amount=EXTRUDE_38_DEPTH)

    # 草圖128 → 除料-伸長62 (cut, through all)
    with BuildSketch(Plane.ZY.offset(16.6)):
        with Locations((32.928668636, -0.30220442)):
            Circle(SKETCH_128_R)
    extrude(amount=-CUT_EXTRUDE_62_DEPTH, mode=Mode.SUBTRACT)

    # 草圖129 → 除料-伸長63 (cut, through all)
    with BuildSketch(Plane.ZY.offset(16.6)):
        with Locations((-32.849487474, -0.30220442)):
            Circle(SKETCH_129_R)
    extrude(amount=-CUT_EXTRUDE_63_DEPTH, mode=Mode.SUBTRACT)

    # 草圖130 → 除料-伸長64 (cut, through all)
    with BuildSketch(Plane(origin=(0, 11.18059116, 0), x_dir=(1, 0, 0), z_dir=(0, 1, 0))):
        with Locations((8.24934609, -18.560780818)):
            Rectangle(SKETCH_130_W, SKETCH_130_H)
    extrude(amount=-CUT_EXTRUDE_64_DEPTH, mode=Mode.SUBTRACT)

    # 草圖136 → 除料-伸長68 (cut)
    with BuildSketch(Plane(origin=(0, 11.18059116, 0), x_dir=(1, 0, 0), z_dir=(0, 1, 0))):
        with Locations((-5.99148813, -32.848092576)):
            Rectangle(SKETCH_136_W, SKETCH_136_H)
    extrude(amount=-CUT_EXTRUDE_68_DEPTH, mode=Mode.SUBTRACT)

    # 草圖138 → 填料-伸長40 (add)
    with BuildSketch(Plane.XY.offset(-17.950780818)):
        with Locations((-13.795744065, -0.30220442)):
            Rectangle(SKETCH_138_W, SKETCH_138_H)
    extrude(amount=EXTRUDE_40_DEPTH)

    # 草圖141 → 填料-伸長41 (add)
    with BuildSketch(Plane(origin=(-4.229893533, 0, 0), x_dir=(0, 0, -1), z_dir=(1, 0, 0))):
        with Locations((-18.558092576, -0.30220442)):
            Rectangle(SKETCH_141_W, SKETCH_141_H)
    extrude(amount=EXTRUDE_41_DEPTH)

    # 草圖144 → 除料-伸長70 (cut)
    with BuildSketch(Plane(origin=(0, 11.18059116, 0), x_dir=(1, 0, 0), z_dir=(0, 1, 0))):
        with Locations((-1.989893533, -18.558092576)):
            Rectangle(SKETCH_144_W, SKETCH_144_H)
    extrude(amount=-CUT_EXTRUDE_70_DEPTH, mode=Mode.SUBTRACT)

    # 草圖146 → 除料-伸長72 (cut, through all)
    with BuildSketch(Plane(origin=(-10.99148813, 0, 0), x_dir=(0, 0, -1), z_dir=(1, 0, 0))):
        with Locations((-32.928668636, -0.30220442)):
            Circle(SKETCH_146_R)
        with Locations((32.849487474, -0.30220442)):
            Circle(SKETCH_146_R)
    extrude(amount=-CUT_EXTRUDE_72_DEPTH, mode=Mode.SUBTRACT)

    # 草圖150 → 除料-伸長74 (cut, through all)
    with BuildSketch(Plane(origin=(-2.989893533, 0, 0), x_dir=(0, 0, -1), z_dir=(1, 0, 0))):
        with Locations((-18.558092575, -0.30220442)):
            Circle(SKETCH_150_R)
    extrude(amount=-CUT_EXTRUDE_74_DEPTH, mode=Mode.SUBTRACT)

    # 草圖152 → 除料-伸長75 (cut)
    with BuildSketch(Plane(origin=(0, 11.18059116, 0), x_dir=(1, 0, 0), z_dir=(0, 1, 0))):
        with Locations((17.050778936, 0.054862893)):
            Rectangle(SKETCH_152_W, SKETCH_152_H)
    extrude(amount=-CUT_EXTRUDE_75_DEPTH, mode=Mode.SUBTRACT)

    # 草圖153 → 伸長-薄件3 (add)
    with BuildSketch(Plane.XZ.offset(11.785)):
        Circle(SKETCH_153_R)
        Circle(SKETCH_153_R_2, mode=Mode.SUBTRACT)
    extrude(amount=-EXTRUDE_3_DEPTH)

    # 草圖155 → 除料-伸長76 (cut)
    with BuildSketch(Plane.XZ.offset(11.785)):
        Polygon((10.837851057, 5.140137107), (1.186892734, 5.140137107), (4.194530467, -5.249862893), (13.472328218, -5.249862893), (13.472328218, 5.140137107), align=None)
    extrude(amount=-CUT_EXTRUDE_76_DEPTH, mode=Mode.SUBTRACT)

    # 草圖156 → 除料-伸長77 (cut)
    with BuildSketch(Plane.XZ.offset(11.785)):
        Circle(SKETCH_156_R)
    extrude(amount=-CUT_EXTRUDE_77_DEPTH, mode=Mode.SUBTRACT)


solid = cut_extrude_41_piece_1_1.part
